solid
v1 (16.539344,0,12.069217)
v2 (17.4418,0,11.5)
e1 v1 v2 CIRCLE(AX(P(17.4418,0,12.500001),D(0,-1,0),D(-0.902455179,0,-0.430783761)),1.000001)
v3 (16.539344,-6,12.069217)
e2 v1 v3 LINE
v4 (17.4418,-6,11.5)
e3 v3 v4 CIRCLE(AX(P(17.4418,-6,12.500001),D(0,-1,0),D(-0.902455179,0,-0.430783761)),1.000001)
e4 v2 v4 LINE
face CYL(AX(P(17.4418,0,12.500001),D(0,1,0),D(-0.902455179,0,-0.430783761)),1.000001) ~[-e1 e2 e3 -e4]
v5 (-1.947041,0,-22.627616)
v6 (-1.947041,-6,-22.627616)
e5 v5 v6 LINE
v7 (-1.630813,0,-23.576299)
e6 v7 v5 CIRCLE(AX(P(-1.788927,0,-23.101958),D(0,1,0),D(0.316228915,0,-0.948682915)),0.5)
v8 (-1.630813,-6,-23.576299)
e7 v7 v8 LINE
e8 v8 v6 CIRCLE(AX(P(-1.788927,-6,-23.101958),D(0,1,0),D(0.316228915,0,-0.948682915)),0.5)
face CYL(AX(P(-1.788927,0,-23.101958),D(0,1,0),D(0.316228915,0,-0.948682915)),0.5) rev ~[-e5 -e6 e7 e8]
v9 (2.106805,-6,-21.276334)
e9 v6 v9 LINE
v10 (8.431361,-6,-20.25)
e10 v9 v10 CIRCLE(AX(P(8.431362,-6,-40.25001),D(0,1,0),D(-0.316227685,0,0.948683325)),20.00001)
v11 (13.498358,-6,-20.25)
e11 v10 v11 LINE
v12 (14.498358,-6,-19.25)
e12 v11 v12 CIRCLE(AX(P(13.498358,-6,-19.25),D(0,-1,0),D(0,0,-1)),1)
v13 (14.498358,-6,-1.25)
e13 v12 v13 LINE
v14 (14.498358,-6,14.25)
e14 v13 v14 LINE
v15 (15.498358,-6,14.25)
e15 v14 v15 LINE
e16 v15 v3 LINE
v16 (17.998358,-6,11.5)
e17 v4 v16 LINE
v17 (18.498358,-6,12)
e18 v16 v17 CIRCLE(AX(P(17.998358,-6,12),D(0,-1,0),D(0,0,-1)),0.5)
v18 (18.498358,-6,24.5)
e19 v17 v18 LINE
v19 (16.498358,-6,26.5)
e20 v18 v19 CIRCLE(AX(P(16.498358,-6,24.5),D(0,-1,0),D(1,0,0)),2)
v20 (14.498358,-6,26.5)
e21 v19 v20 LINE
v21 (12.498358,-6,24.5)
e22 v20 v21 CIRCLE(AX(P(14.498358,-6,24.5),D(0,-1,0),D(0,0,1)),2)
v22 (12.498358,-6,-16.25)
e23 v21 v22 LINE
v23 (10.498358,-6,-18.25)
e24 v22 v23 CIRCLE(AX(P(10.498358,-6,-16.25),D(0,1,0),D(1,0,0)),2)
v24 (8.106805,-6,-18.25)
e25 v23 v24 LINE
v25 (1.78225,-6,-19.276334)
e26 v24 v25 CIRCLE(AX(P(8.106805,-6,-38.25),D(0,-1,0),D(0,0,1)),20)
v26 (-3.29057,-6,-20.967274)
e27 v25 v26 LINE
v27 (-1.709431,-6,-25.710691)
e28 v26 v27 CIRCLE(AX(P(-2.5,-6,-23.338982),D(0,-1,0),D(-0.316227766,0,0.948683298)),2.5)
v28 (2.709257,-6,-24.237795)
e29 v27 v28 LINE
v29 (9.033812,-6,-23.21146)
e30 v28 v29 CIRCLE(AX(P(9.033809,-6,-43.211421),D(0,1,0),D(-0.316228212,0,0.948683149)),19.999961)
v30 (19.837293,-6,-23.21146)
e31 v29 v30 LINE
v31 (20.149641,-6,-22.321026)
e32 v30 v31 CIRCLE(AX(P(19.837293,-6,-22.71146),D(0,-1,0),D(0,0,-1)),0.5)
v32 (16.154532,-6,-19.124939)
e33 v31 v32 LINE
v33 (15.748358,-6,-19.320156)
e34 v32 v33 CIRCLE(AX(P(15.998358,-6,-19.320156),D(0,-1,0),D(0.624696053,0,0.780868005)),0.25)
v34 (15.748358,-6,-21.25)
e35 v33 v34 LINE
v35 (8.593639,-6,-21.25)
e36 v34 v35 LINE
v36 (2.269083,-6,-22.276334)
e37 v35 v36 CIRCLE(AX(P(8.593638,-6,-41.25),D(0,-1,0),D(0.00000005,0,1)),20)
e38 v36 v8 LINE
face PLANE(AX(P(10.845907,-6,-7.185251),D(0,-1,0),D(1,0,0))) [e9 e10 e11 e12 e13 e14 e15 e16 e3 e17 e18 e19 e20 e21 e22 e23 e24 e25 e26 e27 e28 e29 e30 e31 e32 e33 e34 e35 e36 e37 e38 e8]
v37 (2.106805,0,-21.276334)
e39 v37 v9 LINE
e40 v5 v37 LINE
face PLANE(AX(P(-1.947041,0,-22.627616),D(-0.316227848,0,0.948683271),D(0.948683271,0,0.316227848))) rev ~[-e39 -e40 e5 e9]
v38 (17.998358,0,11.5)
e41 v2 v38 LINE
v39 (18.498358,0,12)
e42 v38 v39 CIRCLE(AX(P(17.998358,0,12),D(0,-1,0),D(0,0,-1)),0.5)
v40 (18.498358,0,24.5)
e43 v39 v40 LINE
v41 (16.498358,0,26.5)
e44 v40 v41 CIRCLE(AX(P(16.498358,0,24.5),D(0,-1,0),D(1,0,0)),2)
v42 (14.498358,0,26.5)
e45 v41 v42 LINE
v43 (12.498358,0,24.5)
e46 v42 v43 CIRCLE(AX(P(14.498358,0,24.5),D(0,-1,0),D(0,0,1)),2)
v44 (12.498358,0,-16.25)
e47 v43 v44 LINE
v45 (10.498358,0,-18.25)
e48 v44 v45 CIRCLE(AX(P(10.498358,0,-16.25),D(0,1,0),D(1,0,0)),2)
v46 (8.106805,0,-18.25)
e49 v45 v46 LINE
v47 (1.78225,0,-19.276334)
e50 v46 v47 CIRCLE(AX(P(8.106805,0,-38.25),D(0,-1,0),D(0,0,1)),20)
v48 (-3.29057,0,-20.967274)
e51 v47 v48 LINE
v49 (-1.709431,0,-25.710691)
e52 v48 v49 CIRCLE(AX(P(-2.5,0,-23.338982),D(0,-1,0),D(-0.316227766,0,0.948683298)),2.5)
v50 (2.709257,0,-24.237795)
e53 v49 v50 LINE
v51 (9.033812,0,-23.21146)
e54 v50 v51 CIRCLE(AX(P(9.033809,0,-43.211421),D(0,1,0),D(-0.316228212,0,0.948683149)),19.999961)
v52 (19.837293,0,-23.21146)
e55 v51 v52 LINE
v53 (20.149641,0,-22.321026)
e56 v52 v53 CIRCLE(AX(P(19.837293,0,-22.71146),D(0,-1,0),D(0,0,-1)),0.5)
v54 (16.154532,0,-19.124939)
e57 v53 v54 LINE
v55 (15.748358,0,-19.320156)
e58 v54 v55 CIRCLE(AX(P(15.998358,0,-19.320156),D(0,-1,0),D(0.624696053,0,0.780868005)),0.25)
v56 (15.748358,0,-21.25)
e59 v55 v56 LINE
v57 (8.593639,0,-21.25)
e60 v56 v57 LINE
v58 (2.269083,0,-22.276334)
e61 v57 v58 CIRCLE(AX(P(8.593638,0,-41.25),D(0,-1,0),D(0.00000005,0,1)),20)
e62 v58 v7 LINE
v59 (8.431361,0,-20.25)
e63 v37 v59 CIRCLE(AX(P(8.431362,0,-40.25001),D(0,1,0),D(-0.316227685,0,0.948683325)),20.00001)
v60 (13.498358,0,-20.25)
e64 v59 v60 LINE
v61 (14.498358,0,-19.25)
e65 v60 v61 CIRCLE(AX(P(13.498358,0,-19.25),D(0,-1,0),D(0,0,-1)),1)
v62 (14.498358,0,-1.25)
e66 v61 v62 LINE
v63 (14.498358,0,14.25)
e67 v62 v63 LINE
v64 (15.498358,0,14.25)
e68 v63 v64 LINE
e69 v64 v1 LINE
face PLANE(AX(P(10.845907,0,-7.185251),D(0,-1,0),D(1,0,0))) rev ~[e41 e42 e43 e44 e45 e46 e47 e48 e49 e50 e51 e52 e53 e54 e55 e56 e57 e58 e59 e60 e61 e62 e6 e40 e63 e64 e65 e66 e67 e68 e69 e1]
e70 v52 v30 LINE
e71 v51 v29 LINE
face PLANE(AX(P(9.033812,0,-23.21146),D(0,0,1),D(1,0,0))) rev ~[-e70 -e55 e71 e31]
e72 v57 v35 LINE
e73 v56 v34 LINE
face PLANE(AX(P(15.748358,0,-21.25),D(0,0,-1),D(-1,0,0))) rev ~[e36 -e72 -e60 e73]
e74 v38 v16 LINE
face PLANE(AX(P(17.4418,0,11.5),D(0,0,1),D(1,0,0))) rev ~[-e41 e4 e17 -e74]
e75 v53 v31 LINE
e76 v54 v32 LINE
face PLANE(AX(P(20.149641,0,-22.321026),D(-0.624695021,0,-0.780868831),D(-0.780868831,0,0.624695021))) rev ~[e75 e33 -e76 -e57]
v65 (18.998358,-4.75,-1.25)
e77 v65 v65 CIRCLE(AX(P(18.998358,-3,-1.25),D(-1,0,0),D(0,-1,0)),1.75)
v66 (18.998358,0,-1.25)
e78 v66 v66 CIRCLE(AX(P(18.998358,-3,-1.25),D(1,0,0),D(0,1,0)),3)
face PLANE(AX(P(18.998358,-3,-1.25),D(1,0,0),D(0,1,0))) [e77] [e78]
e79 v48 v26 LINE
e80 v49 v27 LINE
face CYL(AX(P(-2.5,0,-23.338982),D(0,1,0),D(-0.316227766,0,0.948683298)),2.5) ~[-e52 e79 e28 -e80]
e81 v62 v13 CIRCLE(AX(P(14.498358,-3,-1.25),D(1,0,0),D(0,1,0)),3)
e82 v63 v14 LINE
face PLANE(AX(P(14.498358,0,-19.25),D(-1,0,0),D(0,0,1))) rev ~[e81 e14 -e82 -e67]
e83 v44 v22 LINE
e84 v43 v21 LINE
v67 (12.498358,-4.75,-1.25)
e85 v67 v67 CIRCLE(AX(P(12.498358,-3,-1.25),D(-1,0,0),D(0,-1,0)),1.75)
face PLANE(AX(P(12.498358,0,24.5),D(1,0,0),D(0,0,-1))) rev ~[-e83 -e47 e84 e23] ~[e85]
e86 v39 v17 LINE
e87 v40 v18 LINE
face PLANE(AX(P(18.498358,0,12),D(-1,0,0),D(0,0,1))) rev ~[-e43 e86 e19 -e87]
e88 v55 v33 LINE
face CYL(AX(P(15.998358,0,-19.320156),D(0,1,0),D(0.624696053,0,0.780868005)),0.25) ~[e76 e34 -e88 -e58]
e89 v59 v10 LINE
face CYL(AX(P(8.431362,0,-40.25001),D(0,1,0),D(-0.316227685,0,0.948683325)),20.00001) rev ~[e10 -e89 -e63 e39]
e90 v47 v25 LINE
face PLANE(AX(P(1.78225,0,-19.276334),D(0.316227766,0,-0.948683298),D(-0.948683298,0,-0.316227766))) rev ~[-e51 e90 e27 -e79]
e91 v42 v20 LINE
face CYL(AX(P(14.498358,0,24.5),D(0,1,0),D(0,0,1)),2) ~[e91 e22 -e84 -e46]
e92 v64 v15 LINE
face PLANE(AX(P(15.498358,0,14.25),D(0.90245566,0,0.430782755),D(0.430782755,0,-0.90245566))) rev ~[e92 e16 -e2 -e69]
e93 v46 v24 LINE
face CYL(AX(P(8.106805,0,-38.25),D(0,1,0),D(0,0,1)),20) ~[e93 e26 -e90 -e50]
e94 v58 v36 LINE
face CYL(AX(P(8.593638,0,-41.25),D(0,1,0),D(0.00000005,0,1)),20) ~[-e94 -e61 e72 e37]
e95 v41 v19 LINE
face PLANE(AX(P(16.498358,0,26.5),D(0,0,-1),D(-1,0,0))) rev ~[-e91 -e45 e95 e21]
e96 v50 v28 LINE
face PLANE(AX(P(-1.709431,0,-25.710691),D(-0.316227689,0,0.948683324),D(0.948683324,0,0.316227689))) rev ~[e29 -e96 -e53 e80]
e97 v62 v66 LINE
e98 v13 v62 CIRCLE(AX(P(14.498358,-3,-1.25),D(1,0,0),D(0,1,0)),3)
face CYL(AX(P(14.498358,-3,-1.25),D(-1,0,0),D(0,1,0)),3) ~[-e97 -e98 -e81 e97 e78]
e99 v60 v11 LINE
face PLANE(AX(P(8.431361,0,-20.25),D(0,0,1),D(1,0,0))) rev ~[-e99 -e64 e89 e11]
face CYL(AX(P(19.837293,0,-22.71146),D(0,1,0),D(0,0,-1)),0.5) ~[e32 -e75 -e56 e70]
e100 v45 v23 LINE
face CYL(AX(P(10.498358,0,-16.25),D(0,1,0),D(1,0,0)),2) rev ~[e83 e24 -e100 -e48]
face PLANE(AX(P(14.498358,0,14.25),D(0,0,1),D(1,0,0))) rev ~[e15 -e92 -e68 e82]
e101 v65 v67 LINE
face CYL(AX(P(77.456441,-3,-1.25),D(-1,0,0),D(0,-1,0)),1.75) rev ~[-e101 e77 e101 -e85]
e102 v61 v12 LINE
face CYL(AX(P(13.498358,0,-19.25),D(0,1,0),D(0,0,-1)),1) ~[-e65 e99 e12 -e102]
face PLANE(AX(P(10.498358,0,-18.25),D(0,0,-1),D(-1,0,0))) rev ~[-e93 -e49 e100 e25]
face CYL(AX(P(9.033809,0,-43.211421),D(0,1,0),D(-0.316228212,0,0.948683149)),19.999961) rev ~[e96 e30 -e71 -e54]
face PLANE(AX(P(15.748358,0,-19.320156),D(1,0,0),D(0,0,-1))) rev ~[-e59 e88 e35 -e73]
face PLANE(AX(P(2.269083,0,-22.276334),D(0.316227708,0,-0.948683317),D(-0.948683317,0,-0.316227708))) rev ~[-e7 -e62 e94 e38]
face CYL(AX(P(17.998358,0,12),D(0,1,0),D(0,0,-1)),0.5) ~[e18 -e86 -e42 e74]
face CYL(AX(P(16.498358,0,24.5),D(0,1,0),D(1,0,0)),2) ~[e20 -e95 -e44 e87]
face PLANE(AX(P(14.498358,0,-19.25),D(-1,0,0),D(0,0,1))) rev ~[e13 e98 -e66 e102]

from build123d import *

# Parameters (mm, degrees)
F1_DEPTH = 6
F2_R     = 3
F3_DEPTH = 4.5
F5_D     = 3.5


# Not quite as in the source:
# - ends of sketch curves that miss each other by under 0.0002 mm in the source are joined


with BuildPart() as f1:
    # F0 (on Front) → F1 (new body)
    with BuildSketch(Plane.XZ):
        with BuildLine():
            Line((14.498358, 10), (14.498358, 14))
            Line((14.498358, 14), (14.498358, 14.25))
            Line((14.498358, 14.25), (15.498358, 14.25))
            Line((15.498358, 14.25), (16.539344, 12.069217))
            ThreePointArc((16.539344, 12.069217), (16.9083128035, 11.6541918591), (17.4418, 11.5))
            Line((17.4418, 11.5), (17.998358, 11.5))
            ThreePointArc((17.998358, 11.5), (18.3519113906, 11.6464466094), (18.498358, 12))
            Line((18.498358, 12), (18.498358, 24.5))
            ThreePointArc((18.498358, 24.5), (17.9125715624, 25.9142135624), (16.498358, 26.5))
            Line((16.498358, 26.5), (14.498358, 26.5))
            ThreePointArc((14.498358, 26.5), (13.0841444376, 25.9142135624), (12.498358, 24.5))
            Line((12.498358, 24.5), (12.498358, 22.5))
            Line((12.498358, 22.5), (12.498358, -16.25))
            ThreePointArc((12.498358, -16.25), (11.9125715624, -17.6642135624), (10.498358, -18.25))
            Line((10.498358, -18.25), (8.106805, -18.25))
            ThreePointArc((8.106805, -18.25), (4.9031601399, -18.5082508473), (1.7822496797, -19.276334039))
            Line((1.7822496797, -19.276334039), (-3.290569563, -20.9672737865))
            ThreePointArc((-3.290569563, -20.9672737865), (-4.8717084961, -24.1295514929), (-1.7094308537, -25.710690554))
            Line((-1.7094308537, -25.710690554), (2.709257, -24.237795))
            ThreePointArc((2.709257, -24.237795), (5.8301671399, -23.4697108473), (9.033812, -23.21146))
            Line((9.033812, -23.21146), (19.837293, -23.21146))
            ThreePointArc((19.837293, -23.21146), (20.3091070562, -22.8769637655), (20.1496410116, -22.3210259855))
            Line((20.1496410116, -22.3210259855), (16.154532, -19.124939))
            ThreePointArc((16.154532, -19.124939), (15.8900609581, -19.0948301233), (15.748358, -19.320156))
            Line((15.748358, -19.320156), (15.748358, -21.25))
            Line((15.748358, -21.25), (8.593639, -21.25))
            ThreePointArc((8.593639, -21.25), (5.3899932959, -21.5082508219), (2.2690829797, -22.276333939))
            Line((2.2690829797, -22.276333939), (-1.630813, -23.576299))
            ThreePointArc((-1.630813, -23.576299), (-2.263268599, -23.260072033), (-1.947040883, -22.627616351))
            Line((-1.947040883, -22.627616351), (2.106805, -21.276334))
            ThreePointArc((2.106805, -21.276334), (5.2277158277, -20.5082508979), (8.431361, -20.25))
            Line((8.431361, -20.25), (13.498358, -20.25))
            ThreePointArc((13.498358, -20.25), (14.2054647812, -19.9571067812), (14.498358, -19.25))
            Line((14.498358, -19.25), (14.498358, 10))
        make_face()
    extrude(amount=F1_DEPTH)

    # F2 (on face) → F3 (join)
    with BuildSketch(Plane.YZ.offset(14.498358)):
        with Locations((-3, -1.25)):
            Circle(F2_R)
    extrude(amount=F3_DEPTH)

    # F5 (through all)
    with Locations(Plane.YZ.offset(18.998358)):
        with Locations((-3, -1.25)):
            Hole(F5_D / 2)


solid = f1.part
